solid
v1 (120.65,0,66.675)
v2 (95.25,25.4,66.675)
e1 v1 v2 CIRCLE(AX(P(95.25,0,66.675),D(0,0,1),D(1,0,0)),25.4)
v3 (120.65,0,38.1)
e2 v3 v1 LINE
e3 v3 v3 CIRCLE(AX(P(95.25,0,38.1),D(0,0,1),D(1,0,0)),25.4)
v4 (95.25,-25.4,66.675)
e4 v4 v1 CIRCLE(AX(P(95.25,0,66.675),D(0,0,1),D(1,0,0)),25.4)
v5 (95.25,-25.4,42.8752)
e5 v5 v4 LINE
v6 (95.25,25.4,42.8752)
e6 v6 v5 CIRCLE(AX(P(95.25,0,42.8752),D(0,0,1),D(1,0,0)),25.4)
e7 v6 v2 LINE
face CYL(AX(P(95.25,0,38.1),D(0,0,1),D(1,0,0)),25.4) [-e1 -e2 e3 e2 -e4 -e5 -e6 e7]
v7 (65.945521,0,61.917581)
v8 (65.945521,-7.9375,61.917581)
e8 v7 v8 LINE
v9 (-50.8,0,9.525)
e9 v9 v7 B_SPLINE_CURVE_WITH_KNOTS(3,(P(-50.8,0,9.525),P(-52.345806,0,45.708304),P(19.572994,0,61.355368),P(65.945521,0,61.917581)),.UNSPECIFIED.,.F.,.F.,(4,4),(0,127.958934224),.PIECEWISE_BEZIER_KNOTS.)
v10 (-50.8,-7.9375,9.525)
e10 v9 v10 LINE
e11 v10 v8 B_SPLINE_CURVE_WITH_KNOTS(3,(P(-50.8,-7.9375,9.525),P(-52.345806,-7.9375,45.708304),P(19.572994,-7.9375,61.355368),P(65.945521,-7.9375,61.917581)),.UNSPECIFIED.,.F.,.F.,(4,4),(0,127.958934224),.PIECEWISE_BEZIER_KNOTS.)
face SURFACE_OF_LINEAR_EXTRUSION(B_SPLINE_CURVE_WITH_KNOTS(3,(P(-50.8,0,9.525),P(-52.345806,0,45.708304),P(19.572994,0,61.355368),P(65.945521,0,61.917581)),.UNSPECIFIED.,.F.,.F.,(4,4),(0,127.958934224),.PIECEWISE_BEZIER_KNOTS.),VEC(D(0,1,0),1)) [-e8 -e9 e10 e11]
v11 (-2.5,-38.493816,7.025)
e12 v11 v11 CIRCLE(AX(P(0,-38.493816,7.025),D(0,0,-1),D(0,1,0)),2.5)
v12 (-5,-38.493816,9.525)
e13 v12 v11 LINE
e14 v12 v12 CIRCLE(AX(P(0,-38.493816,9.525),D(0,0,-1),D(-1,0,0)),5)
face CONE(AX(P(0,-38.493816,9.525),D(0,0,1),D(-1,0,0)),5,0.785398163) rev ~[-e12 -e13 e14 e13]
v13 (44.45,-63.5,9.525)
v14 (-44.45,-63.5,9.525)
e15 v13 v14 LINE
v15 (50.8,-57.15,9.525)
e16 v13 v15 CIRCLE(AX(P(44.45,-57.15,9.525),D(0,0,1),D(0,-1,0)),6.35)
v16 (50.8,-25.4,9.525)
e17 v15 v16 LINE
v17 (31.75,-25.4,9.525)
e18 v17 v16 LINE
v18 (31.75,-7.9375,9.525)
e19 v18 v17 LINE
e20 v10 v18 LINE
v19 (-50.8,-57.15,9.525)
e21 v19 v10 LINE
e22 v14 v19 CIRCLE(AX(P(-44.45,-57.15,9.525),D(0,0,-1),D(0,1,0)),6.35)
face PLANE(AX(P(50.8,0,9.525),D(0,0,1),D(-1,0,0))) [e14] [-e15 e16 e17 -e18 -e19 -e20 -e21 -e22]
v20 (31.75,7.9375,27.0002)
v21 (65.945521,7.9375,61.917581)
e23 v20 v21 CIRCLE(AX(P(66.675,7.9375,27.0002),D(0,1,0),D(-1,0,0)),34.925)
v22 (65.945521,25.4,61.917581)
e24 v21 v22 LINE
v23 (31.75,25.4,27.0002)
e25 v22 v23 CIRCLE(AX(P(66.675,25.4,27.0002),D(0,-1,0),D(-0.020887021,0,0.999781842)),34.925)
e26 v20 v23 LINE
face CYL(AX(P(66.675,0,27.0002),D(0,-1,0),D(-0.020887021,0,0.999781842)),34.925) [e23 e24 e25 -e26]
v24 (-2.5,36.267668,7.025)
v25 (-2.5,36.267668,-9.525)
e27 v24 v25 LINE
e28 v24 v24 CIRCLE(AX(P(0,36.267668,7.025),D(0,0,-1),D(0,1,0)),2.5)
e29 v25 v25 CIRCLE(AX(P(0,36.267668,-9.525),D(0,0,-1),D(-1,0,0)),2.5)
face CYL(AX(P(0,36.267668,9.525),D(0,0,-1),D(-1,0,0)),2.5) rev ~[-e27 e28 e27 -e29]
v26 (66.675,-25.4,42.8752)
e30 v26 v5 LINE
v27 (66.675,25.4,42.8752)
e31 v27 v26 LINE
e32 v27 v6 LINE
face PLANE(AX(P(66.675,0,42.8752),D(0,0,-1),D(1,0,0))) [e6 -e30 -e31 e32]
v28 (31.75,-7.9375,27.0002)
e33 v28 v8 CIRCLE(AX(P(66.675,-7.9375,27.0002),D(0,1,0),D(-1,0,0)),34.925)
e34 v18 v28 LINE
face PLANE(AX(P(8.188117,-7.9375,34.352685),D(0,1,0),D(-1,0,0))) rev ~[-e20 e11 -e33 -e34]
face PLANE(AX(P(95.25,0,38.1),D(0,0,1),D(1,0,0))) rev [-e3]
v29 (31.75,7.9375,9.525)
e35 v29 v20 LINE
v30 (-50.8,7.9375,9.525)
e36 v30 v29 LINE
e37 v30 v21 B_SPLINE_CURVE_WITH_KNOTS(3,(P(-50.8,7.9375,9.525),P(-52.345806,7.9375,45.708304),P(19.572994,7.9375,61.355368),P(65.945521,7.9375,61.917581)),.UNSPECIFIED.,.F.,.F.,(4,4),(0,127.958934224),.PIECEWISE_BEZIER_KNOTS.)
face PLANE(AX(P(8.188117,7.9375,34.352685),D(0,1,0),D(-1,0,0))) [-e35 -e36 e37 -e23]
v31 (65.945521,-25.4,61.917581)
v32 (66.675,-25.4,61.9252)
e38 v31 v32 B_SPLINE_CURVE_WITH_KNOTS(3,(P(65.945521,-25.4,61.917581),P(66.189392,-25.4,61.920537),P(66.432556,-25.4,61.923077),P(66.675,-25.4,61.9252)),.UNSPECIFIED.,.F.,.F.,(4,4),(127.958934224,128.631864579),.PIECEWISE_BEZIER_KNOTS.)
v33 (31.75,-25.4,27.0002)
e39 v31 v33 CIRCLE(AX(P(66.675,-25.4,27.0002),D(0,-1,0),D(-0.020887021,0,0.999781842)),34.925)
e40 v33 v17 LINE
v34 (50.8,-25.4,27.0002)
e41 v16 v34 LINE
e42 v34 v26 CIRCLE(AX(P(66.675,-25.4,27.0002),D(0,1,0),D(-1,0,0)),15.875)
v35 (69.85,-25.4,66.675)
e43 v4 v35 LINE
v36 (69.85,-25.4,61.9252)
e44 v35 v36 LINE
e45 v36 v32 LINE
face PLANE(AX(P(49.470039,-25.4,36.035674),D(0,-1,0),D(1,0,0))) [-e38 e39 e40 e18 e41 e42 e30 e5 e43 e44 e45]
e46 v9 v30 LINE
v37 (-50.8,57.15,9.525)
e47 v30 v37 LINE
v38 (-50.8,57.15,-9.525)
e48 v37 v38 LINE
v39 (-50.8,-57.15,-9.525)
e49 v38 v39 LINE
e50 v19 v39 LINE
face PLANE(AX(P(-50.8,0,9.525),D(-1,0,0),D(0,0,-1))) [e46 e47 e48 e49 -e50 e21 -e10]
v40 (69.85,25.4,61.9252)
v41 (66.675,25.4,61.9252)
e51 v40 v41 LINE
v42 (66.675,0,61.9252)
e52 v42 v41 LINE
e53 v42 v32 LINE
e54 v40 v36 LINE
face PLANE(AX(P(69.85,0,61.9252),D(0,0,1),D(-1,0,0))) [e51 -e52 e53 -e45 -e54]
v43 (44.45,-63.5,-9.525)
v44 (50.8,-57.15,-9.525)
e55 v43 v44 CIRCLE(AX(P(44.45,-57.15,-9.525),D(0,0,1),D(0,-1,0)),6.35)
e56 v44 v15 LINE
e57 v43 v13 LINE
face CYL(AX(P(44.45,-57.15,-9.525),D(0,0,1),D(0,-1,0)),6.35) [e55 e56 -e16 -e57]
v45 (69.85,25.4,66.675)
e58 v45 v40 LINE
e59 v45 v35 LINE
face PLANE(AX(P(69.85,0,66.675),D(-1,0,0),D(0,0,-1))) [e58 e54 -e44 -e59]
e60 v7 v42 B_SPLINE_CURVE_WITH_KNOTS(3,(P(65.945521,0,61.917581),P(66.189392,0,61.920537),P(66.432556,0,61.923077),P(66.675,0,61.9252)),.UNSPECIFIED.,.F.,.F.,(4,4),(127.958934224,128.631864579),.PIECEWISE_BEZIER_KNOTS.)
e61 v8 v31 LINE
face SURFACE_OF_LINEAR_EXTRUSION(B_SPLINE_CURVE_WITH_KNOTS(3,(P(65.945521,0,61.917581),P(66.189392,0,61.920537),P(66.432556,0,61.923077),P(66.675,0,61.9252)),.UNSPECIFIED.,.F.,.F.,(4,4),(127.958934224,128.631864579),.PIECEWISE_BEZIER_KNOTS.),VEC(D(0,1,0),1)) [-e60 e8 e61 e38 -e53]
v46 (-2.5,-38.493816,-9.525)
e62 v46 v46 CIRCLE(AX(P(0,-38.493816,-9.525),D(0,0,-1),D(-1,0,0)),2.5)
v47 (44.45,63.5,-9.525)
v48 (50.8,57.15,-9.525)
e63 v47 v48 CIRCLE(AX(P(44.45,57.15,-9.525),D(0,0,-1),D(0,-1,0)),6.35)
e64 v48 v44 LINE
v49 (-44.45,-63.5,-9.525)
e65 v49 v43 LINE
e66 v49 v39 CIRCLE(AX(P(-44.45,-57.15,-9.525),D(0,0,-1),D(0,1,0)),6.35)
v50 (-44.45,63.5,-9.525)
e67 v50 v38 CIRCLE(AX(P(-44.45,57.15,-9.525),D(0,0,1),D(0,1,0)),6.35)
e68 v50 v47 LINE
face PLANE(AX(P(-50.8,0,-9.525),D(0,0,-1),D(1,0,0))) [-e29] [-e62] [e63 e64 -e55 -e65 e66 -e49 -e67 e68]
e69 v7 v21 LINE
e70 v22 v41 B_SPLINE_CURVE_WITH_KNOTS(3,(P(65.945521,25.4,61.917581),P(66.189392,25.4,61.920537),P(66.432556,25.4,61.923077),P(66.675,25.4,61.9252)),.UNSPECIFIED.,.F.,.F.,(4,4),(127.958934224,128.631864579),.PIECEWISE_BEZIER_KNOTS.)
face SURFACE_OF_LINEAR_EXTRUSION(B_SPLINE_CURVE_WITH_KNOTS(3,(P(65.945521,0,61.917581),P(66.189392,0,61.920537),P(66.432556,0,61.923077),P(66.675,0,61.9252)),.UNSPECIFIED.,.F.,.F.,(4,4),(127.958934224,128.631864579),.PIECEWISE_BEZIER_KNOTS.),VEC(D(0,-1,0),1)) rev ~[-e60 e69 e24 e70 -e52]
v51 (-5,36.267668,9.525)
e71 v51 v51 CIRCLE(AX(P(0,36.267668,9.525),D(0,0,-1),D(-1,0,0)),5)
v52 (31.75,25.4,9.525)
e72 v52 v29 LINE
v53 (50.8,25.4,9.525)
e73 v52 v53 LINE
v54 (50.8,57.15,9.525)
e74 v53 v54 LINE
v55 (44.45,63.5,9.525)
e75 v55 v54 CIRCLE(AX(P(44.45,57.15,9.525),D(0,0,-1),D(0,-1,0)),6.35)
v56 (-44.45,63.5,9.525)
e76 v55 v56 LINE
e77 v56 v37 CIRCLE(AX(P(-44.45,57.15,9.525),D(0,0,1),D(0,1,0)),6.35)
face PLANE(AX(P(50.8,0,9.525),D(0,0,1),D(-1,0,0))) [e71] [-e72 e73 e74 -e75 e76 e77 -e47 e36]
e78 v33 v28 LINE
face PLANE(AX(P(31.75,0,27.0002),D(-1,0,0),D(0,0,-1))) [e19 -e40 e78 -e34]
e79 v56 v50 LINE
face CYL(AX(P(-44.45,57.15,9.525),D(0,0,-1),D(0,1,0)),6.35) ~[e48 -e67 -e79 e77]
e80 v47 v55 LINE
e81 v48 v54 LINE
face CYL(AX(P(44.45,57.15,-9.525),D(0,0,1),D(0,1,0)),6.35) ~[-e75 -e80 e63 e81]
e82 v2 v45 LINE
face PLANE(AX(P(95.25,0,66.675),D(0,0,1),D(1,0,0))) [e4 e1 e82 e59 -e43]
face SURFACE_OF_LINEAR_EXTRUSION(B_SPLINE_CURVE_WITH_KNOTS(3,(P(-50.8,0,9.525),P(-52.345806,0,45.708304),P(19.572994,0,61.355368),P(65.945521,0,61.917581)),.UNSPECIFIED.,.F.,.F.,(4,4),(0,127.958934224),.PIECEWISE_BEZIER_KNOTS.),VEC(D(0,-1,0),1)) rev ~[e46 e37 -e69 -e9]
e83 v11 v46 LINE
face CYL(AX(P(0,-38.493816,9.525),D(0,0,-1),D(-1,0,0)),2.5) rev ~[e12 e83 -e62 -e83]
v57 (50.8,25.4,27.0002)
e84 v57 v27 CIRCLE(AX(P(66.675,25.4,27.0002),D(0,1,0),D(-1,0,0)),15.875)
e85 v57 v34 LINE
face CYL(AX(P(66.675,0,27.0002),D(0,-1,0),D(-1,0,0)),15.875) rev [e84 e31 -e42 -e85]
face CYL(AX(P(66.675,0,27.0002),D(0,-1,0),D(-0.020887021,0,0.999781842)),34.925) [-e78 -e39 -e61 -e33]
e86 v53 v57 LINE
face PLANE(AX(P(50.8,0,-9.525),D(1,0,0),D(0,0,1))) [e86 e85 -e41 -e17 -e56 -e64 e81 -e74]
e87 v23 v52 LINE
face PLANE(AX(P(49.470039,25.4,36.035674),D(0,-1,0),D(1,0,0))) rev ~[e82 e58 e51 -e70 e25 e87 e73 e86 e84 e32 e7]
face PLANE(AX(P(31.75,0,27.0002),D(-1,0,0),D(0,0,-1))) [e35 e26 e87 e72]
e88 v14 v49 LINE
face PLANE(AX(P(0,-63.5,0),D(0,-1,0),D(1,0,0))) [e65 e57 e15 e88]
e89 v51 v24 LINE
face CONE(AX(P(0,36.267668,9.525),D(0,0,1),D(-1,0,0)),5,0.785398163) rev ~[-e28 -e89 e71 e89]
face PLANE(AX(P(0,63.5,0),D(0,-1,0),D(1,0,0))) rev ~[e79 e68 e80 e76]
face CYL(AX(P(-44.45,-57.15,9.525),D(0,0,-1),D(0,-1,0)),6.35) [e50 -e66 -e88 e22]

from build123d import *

# Parameters (mm, degrees)
F1_DEPTH       = 63.5
F2_DEPTH       = 25.4
F3_DEPTH       = 7.9375
F5_R           = 6.35
F7_D           = 5
F7_CSINK_D     = 10
F7_CSINK_ANGLE = 90


# Not quite as in the source:
# - a feature names something its author has since deleted; it is built from what else it names


with BuildPart() as f1:
    # F0 (on Front) → F1 (new body, symmetric)
    with BuildSketch(Plane.XZ):
        Polygon((31.75, 9.525), (-50.8, 9.525), (-50.8, -9.525), (50.8, -9.525), (50.8, 9.525), align=None)
    extrude(amount=F1_DEPTH, both=True)

    # F0 (on Front) → F2 (join, symmetric)
    with BuildSketch(Plane.XZ):
        with BuildLine():
            Line((31.75, 27.0002), (31.75, 9.525))
            Line((31.75, 9.525), (50.8, 9.525))
            Line((50.8, 9.525), (50.8, 27.0002))
            ThreePointArc((50.8, 27.0002), (55.4496798487, 38.2255201513), (66.675, 42.8752))
            Line((66.675, 42.8752), (69.85, 42.8752))
            Line((69.85, 42.8752), (69.85, 61.9252))
            Line((69.85, 61.9252), (66.675, 61.9252))
            add(Edge.make_bspline(
                [(65.9455207974, 61.9175808453), (66.1893918553, 61.9205374951), (66.4325563897, 61.9230769491), (66.675, 61.9252)],
                knots=[127.9589342237, 127.9589342237, 127.9589342237, 127.9589342237, 128.6318645789, 128.6318645789, 128.6318645789, 128.6318645789], degree=3))
            ThreePointArc((65.9455207974, 61.9175808453), (41.72271868, 51.4366334944), (31.75, 27.0002))
        make_face()
        Polygon((69.85, 66.675), (69.85, 61.9252), (69.85, 42.8752), (95.25, 42.8752), (95.25, 66.675), align=None)
    extrude(amount=F2_DEPTH, both=True)

    # F0 (on Front) → F3 (join, symmetric)
    with BuildSketch(Plane.XZ):
        with BuildLine():
            add(Edge.make_bspline(
                [(-50.8, 9.525), (-52.3458055459, 45.7083043223), (19.5729944142, 61.3553684788), (65.9455207974, 61.9175808453)],
                knots=[0, 0, 0, 0, 127.9589342237, 127.9589342237, 127.9589342237, 127.9589342237], degree=3))
            Line((-50.8, 9.525), (31.75, 9.525))
            Line((31.75, 9.525), (31.75, 27.0002))
            ThreePointArc((31.75, 27.0002), (41.72271868, 51.4366334944), (65.9455207974, 61.9175808453))
        make_face()
    extrude(amount=F3_DEPTH, both=True)

    # F0 (on Front) → F4 (revolve)
    with BuildSketch(Plane.XZ):
        Polygon((120.65, 66.675), (95.25, 66.675), (95.25, 42.8752), (95.25, 38.1), (120.65, 38.1), align=None)
    revolve(axis=Axis((95.25, 0, 52.3875), (0, 0, 1)))

    # F5
    f5_edges = [f1.edges().sort_by_distance(p)[0] for p in [
        (50.8, -63.5, 0),
        (-50.8, -63.5, 0),
        (-50.8, 63.5, 0),
        (50.8, 63.5, 0),
    ]]
    fillet(f5_edges, radius=F5_R)

    # F7 (through all)
    with Locations(Plane.XY.offset(9.525)):
        with Locations((0, 36.2676680088), (0, -38.4938158095)):
            CounterSinkHole(F7_D / 2, F7_CSINK_D / 2, counter_sink_angle=F7_CSINK_ANGLE)


solid = f1.part
